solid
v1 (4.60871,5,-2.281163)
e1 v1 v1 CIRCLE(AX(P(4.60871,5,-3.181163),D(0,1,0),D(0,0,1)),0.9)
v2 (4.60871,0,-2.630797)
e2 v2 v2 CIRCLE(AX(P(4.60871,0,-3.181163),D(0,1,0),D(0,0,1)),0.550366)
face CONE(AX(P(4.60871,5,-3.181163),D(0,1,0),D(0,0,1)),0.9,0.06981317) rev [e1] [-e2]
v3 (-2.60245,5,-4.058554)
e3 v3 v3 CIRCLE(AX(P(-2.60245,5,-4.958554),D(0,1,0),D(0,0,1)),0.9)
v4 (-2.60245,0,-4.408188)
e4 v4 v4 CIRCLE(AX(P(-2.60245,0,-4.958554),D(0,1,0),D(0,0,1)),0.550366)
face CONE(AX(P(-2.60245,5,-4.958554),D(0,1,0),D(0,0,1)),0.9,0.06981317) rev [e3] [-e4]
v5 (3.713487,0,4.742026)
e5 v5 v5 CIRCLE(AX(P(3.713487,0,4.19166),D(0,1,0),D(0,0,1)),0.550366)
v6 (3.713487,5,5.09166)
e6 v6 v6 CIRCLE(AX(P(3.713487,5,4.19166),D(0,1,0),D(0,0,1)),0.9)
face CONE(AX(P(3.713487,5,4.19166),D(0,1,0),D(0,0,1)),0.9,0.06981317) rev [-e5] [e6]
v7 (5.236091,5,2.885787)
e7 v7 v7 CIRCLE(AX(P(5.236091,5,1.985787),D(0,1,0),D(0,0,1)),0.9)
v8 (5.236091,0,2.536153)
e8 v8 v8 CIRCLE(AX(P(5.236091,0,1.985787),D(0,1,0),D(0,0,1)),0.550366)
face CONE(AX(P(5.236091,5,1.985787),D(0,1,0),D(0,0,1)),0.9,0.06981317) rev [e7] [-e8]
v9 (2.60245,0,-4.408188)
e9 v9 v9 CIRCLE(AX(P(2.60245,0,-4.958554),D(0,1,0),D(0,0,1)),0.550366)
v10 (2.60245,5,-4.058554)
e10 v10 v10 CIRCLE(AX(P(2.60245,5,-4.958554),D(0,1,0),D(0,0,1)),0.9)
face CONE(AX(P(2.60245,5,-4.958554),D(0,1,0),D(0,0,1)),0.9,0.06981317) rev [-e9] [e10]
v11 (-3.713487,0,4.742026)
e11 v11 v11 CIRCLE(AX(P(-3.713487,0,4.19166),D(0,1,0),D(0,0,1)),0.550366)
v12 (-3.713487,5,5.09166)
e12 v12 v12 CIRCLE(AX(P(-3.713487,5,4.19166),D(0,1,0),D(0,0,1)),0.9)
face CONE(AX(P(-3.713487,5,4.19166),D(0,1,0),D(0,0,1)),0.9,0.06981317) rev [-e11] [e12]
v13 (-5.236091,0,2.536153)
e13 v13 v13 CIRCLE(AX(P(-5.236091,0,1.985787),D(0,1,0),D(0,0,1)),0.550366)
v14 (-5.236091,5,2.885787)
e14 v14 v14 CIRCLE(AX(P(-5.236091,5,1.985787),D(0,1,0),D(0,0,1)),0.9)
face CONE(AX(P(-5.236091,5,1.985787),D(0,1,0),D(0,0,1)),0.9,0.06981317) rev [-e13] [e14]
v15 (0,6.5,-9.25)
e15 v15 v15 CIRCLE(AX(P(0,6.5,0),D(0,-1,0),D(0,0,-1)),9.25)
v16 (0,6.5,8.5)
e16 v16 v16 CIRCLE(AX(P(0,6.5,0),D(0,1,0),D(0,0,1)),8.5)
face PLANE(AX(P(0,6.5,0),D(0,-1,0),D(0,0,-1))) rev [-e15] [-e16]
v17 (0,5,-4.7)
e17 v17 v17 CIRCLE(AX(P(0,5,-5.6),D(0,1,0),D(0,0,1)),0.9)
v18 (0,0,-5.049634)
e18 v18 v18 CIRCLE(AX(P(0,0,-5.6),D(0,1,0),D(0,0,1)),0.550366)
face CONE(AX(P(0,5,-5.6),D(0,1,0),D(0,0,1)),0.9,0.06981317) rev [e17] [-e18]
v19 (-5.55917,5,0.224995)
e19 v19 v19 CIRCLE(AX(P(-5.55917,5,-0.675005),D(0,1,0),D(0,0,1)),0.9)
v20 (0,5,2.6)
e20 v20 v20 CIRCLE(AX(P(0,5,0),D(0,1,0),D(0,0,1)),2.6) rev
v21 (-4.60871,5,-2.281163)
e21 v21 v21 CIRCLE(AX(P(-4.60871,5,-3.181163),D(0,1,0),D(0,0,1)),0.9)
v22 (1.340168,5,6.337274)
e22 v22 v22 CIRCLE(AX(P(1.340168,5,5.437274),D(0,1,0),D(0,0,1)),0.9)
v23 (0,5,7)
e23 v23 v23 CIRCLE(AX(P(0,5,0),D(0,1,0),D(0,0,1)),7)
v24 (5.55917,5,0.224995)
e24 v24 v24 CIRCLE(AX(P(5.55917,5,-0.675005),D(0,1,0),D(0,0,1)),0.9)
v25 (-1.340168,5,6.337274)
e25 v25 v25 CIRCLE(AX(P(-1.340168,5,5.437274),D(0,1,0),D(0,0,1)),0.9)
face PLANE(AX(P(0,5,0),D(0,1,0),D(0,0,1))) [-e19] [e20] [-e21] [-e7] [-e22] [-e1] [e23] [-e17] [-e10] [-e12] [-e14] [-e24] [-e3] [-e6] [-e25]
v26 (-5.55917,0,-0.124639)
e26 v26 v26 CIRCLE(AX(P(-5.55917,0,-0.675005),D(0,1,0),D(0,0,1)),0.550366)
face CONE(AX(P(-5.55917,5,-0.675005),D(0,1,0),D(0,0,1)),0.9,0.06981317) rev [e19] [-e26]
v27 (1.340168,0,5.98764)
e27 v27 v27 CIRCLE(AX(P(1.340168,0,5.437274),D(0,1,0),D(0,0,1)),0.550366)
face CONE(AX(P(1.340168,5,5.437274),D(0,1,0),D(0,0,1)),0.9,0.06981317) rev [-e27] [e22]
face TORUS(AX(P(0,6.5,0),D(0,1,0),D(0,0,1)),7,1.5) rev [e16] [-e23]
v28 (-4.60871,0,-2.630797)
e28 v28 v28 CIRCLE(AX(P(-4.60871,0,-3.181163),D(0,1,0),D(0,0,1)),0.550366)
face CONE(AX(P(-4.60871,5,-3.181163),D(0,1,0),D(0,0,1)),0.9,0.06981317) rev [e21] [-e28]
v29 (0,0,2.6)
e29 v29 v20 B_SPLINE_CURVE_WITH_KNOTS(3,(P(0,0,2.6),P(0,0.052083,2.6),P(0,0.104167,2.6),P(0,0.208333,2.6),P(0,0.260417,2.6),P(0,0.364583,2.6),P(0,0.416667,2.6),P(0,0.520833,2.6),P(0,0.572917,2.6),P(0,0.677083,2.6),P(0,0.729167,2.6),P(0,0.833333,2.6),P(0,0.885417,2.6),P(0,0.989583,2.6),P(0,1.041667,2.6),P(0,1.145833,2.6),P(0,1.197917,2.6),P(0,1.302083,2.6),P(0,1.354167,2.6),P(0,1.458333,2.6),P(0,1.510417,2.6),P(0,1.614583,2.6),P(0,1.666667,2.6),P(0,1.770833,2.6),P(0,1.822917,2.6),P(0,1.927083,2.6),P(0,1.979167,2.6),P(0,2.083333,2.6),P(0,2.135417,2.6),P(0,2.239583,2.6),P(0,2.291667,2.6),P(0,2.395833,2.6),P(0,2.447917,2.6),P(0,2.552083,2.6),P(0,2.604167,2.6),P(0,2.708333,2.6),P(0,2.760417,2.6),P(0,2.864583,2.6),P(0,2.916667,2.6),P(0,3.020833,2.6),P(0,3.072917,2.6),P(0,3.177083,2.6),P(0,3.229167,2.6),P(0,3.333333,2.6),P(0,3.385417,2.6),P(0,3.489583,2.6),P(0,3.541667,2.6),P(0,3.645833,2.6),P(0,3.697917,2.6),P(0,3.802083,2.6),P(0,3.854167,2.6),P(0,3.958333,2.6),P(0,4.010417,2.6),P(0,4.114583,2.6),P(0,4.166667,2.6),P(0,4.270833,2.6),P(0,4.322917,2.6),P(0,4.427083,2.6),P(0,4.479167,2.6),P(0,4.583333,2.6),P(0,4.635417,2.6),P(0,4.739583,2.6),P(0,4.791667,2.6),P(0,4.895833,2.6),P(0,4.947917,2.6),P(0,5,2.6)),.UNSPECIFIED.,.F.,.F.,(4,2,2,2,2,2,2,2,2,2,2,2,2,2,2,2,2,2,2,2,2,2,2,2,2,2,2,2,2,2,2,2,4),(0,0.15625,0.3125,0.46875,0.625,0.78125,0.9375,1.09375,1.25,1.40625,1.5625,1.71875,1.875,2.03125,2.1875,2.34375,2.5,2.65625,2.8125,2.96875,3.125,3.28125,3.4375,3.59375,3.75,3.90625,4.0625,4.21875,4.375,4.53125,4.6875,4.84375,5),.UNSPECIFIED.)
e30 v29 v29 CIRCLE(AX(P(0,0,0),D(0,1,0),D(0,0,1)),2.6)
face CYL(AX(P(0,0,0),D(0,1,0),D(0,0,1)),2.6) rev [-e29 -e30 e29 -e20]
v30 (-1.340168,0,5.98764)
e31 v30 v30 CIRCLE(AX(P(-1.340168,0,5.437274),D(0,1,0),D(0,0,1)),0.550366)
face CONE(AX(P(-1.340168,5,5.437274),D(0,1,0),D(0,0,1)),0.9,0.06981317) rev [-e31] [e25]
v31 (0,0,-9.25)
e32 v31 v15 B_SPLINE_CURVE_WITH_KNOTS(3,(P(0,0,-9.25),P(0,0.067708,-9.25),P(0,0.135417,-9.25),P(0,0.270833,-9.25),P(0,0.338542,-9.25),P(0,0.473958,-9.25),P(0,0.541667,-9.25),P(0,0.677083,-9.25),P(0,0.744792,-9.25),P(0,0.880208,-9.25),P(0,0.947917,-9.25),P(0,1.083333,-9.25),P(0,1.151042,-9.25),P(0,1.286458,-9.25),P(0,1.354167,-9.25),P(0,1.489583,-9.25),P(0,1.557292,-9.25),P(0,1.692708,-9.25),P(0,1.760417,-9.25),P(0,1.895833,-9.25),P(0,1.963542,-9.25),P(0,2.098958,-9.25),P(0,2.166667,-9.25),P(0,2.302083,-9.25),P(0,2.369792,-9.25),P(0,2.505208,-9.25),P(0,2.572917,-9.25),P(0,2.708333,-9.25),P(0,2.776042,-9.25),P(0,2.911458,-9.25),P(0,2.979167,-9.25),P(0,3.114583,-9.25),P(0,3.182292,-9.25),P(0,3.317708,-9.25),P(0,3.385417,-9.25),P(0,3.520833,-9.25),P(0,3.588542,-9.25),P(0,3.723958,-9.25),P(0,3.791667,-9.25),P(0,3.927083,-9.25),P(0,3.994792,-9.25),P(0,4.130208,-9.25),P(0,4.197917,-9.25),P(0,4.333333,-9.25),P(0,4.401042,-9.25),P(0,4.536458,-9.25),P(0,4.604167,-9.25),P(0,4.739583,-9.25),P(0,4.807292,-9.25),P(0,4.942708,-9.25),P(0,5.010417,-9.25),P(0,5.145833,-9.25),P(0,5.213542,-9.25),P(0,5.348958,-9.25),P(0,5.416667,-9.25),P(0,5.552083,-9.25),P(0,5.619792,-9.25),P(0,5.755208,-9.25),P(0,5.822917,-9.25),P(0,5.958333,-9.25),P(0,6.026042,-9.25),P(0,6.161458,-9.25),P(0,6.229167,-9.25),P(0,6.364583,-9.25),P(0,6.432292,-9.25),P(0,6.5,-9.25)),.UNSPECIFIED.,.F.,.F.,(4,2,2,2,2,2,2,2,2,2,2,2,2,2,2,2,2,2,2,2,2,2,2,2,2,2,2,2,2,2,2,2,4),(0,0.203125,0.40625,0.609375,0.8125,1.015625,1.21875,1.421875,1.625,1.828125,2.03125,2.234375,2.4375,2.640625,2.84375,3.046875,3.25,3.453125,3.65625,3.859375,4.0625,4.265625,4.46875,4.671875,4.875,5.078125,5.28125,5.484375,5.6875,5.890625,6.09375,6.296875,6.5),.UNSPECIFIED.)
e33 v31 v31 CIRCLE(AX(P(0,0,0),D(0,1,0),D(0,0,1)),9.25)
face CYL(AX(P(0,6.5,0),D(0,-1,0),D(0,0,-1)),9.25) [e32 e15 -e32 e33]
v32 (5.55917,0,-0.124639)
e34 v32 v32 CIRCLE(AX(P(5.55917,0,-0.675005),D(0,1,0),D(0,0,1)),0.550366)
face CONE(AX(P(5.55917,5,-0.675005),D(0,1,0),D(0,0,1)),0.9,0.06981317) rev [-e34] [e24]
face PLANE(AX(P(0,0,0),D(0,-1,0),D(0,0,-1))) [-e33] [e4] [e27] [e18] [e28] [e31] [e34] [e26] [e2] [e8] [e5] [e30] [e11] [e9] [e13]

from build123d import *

# Parameters (mm, degrees)
BOSS_EXTRU_1_DEPTH      = 6.5
ESQUISSE6_R             = 2.6
ENL_V_MAT_EXTRU_2_DEPTH = 15.607361158
ESQUISSE7_R             = 8.5
ENL_V_MAT_EXTRU_4_DEPTH = 1.5
CONG_1_R                = 1.5


with BuildPart() as part:
    # Esquisse1 → Boss.-Extru.1 (new body)
    with BuildSketch(Plane(origin=(0, 0, 0), x_dir=(1, 0, 0), z_dir=(0, 1, 0))):
        with BuildLine():
            ThreePointArc((-4.625, -8.010734985), (0, -9.25), (4.625, -8.010734985))
            ThreePointArc((4.625, -8.010734985), (9.25, 0), (4.625, 8.010734985))
            ThreePointArc((4.625, 8.010734985), (0, 9.25), (-4.625, 8.010734985))
            ThreePointArc((-4.625, 8.010734985), (-9.25, 0), (-4.625, -8.010734985))
        make_face()
    extrude(amount=BOSS_EXTRU_1_DEPTH)

    # Esquisse6 → Enlèv. mat.-Extru.2 (cut, through all)
    with BuildSketch(Plane(origin=(0, 6.5, 0), x_dir=(1, 0, 0), z_dir=(0, 1, 0))):
        with Locations(Location((0, 0, 0), (0, 0, 270))):
            Circle(ESQUISSE6_R)
    extrude(amount=-ENL_V_MAT_EXTRU_2_DEPTH, mode=Mode.SUBTRACT)

    # Esquisse7 → Enlèv. mat.-Extru.4 (cut)
    with BuildSketch(Plane(origin=(0, 6.5, 0), x_dir=(1, 0, 0), z_dir=(0, 1, 0))):
        with Locations(Location((0, 0, 0), (0, 0, 270))):
            Circle(ESQUISSE7_R)
    extrude(amount=-ENL_V_MAT_EXTRU_4_DEPTH, mode=Mode.SUBTRACT)

    # Congé1
    cong_1_edges = [part.edges().sort_by_distance(p)[0] for p in [
        (0, 5, -8.5),
    ]]
    fillet(cong_1_edges, radius=CONG_1_R - 0.0001)  # a hair under: the kernel refuses the full size

    # Enlèv. mat.-Extru.3 cone 1 section (through the dimple's axis) → Enlèv. mat.-Extru.3 (revolve, cut)
    with BuildSketch(Plane(origin=(0, 5, -5.6), x_dir=(0, 0, 1), z_dir=(1, 0, 0))):
        Polygon((0, 0), (0.9, 0), (0, 12.870599631), align=None)
    revolve(axis=Axis((0, 5, -5.6), (0, -1, 0)), mode=Mode.SUBTRACT)

    # Enlèv. mat.-Extru.3 cone 2 section (through the dimple's axis) → Enlèv. mat.-Extru.3 cone 2 (revolve, cut)
    with BuildSketch(Plane(origin=(2.602449763, 5, -4.958553744), x_dir=(0, 0, 1), z_dir=(1, 0, 0))):
        Polygon((0, 0), (0.9, 0), (0, 12.870599631), align=None)
    revolve(axis=Axis((2.602449763, 5, -4.958553744), (0, -1, 0)), mode=Mode.SUBTRACT)

    # Enlèv. mat.-Extru.3 cone 3 section (through the dimple's axis) → Enlèv. mat.-Extru.3 cone 3 (revolve, cut)
    with BuildSketch(Plane(origin=(4.608709649, 5, -3.181162582), x_dir=(0, 0, 1), z_dir=(1, 0, 0))):
        Polygon((0, 0), (0.9, 0), (0, 12.870599631), align=None)
    revolve(axis=Axis((4.608709649, 5, -3.181162582), (0, -1, 0)), mode=Mode.SUBTRACT)

    # Enlèv. mat.-Extru.3 cone 4 section (through the dimple's axis) → Enlèv. mat.-Extru.3 cone 4 (revolve, cut)
    with BuildSketch(Plane(origin=(5.559169695, 5, -0.675005409), x_dir=(0, 0, 1), z_dir=(1, 0, 0))):
        Polygon((0, 0), (0.9, 0), (0, 12.870599631), align=None)
    revolve(axis=Axis((5.559169695, 5, -0.675005409), (0, -1, 0)), mode=Mode.SUBTRACT)

    # Enlèv. mat.-Extru.3 cone 5 section (through the dimple's axis) → Enlèv. mat.-Extru.3 cone 5 (revolve, cut)
    with BuildSketch(Plane(origin=(5.236090959, 5, 1.985787367), x_dir=(0, 0, 1), z_dir=(1, 0, 0))):
        Polygon((0, 0), (0.9, 0), (0, 12.870599631), align=None)
    revolve(axis=Axis((5.236090959, 5, 1.985787367), (0, -1, 0)), mode=Mode.SUBTRACT)

    # Enlèv. mat.-Extru.3 cone 6 section (through the dimple's axis) → Enlèv. mat.-Extru.3 cone 6 (revolve, cut)
    with BuildSketch(Plane(origin=(3.713486886, 5, 4.19166019), x_dir=(0, 0, 1), z_dir=(1, 0, 0))):
        Polygon((0, 0), (0.9, 0), (0, 12.870599631), align=None)
    revolve(axis=Axis((3.713486886, 5, 4.19166019), (0, -1, 0)), mode=Mode.SUBTRACT)

    # Enlèv. mat.-Extru.3 cone 7 section (through the dimple's axis) → Enlèv. mat.-Extru.3 cone 7 (revolve, cut)
    with BuildSketch(Plane(origin=(1.34016772, 5, 5.437274178), x_dir=(0, 0, 1), z_dir=(1, 0, 0))):
        Polygon((0, 0), (0.9, 0), (0, 12.870599631), align=None)
    revolve(axis=Axis((1.34016772, 5, 5.437274178), (0, -1, 0)), mode=Mode.SUBTRACT)

    # Enlèv. mat.-Extru.3 cone 8 section (through the dimple's axis) → Enlèv. mat.-Extru.3 cone 8 (revolve, cut)
    with BuildSketch(Plane(origin=(-1.34016772, 5, 5.437274178), x_dir=(0, 0, 1), z_dir=(1, 0, 0))):
        Polygon((0, 0), (0.9, 0), (0, 12.870599631), align=None)
    revolve(axis=Axis((-1.34016772, 5, 5.437274178), (0, -1, 0)), mode=Mode.SUBTRACT)

    # Enlèv. mat.-Extru.3 cone 9 section (through the dimple's axis) → Enlèv. mat.-Extru.3 cone 9 (revolve, cut)
    with BuildSketch(Plane(origin=(-3.713486886, 5, 4.19166019), x_dir=(0, 0, 1), z_dir=(1, 0, 0))):
        Polygon((0, 0), (0.9, 0), (0, 12.870599631), align=None)
    revolve(axis=Axis((-3.713486886, 5, 4.19166019), (0, -1, 0)), mode=Mode.SUBTRACT)

    # Enlèv. mat.-Extru.3 cone 10 section (through the dimple's axis) → Enlèv. mat.-Extru.3 cone 10 (revolve, cut)
    with BuildSketch(Plane(origin=(-5.236090959, 5, 1.985787367), x_dir=(0, 0, 1), z_dir=(1, 0, 0))):
        Polygon((0, 0), (0.9, 0), (0, 12.870599631), align=None)
    revolve(axis=Axis((-5.236090959, 5, 1.985787367), (0, -1, 0)), mode=Mode.SUBTRACT)

    # Enlèv. mat.-Extru.3 cone 11 section (through the dimple's axis) → Enlèv. mat.-Extru.3 cone 11 (revolve, cut)
    with BuildSketch(Plane(origin=(-5.559169695, 5, -0.675005409), x_dir=(0, 0, 1), z_dir=(1, 0, 0))):
        Polygon((0, 0), (0.9, 0), (0, 12.870599631), align=None)
    revolve(axis=Axis((-5.559169695, 5, -0.675005409), (0, -1, 0)), mode=Mode.SUBTRACT)

    # Enlèv. mat.-Extru.3 cone 12 section (through the dimple's axis) → Enlèv. mat.-Extru.3 cone 12 (revolve, cut)
    with BuildSketch(Plane(origin=(-4.608709649, 5, -3.181162582), x_dir=(0, 0, 1), z_dir=(1, 0, 0))):
        Polygon((0, 0), (0.9, 0), (0, 12.870599631), align=None)
    revolve(axis=Axis((-4.608709649, 5, -3.181162582), (0, -1, 0)), mode=Mode.SUBTRACT)

    # Enlèv. mat.-Extru.3 cone 13 section (through the dimple's axis) → Enlèv. mat.-Extru.3 cone 13 (revolve, cut)
    with BuildSketch(Plane(origin=(-2.602449763, 5, -4.958553744), x_dir=(0, 0, 1), z_dir=(1, 0, 0))):
        Polygon((0, 0), (0.9, 0), (0, 12.870599631), align=None)
    revolve(axis=Axis((-2.602449763, 5, -4.958553744), (0, -1, 0)), mode=Mode.SUBTRACT)


solid = part.part
